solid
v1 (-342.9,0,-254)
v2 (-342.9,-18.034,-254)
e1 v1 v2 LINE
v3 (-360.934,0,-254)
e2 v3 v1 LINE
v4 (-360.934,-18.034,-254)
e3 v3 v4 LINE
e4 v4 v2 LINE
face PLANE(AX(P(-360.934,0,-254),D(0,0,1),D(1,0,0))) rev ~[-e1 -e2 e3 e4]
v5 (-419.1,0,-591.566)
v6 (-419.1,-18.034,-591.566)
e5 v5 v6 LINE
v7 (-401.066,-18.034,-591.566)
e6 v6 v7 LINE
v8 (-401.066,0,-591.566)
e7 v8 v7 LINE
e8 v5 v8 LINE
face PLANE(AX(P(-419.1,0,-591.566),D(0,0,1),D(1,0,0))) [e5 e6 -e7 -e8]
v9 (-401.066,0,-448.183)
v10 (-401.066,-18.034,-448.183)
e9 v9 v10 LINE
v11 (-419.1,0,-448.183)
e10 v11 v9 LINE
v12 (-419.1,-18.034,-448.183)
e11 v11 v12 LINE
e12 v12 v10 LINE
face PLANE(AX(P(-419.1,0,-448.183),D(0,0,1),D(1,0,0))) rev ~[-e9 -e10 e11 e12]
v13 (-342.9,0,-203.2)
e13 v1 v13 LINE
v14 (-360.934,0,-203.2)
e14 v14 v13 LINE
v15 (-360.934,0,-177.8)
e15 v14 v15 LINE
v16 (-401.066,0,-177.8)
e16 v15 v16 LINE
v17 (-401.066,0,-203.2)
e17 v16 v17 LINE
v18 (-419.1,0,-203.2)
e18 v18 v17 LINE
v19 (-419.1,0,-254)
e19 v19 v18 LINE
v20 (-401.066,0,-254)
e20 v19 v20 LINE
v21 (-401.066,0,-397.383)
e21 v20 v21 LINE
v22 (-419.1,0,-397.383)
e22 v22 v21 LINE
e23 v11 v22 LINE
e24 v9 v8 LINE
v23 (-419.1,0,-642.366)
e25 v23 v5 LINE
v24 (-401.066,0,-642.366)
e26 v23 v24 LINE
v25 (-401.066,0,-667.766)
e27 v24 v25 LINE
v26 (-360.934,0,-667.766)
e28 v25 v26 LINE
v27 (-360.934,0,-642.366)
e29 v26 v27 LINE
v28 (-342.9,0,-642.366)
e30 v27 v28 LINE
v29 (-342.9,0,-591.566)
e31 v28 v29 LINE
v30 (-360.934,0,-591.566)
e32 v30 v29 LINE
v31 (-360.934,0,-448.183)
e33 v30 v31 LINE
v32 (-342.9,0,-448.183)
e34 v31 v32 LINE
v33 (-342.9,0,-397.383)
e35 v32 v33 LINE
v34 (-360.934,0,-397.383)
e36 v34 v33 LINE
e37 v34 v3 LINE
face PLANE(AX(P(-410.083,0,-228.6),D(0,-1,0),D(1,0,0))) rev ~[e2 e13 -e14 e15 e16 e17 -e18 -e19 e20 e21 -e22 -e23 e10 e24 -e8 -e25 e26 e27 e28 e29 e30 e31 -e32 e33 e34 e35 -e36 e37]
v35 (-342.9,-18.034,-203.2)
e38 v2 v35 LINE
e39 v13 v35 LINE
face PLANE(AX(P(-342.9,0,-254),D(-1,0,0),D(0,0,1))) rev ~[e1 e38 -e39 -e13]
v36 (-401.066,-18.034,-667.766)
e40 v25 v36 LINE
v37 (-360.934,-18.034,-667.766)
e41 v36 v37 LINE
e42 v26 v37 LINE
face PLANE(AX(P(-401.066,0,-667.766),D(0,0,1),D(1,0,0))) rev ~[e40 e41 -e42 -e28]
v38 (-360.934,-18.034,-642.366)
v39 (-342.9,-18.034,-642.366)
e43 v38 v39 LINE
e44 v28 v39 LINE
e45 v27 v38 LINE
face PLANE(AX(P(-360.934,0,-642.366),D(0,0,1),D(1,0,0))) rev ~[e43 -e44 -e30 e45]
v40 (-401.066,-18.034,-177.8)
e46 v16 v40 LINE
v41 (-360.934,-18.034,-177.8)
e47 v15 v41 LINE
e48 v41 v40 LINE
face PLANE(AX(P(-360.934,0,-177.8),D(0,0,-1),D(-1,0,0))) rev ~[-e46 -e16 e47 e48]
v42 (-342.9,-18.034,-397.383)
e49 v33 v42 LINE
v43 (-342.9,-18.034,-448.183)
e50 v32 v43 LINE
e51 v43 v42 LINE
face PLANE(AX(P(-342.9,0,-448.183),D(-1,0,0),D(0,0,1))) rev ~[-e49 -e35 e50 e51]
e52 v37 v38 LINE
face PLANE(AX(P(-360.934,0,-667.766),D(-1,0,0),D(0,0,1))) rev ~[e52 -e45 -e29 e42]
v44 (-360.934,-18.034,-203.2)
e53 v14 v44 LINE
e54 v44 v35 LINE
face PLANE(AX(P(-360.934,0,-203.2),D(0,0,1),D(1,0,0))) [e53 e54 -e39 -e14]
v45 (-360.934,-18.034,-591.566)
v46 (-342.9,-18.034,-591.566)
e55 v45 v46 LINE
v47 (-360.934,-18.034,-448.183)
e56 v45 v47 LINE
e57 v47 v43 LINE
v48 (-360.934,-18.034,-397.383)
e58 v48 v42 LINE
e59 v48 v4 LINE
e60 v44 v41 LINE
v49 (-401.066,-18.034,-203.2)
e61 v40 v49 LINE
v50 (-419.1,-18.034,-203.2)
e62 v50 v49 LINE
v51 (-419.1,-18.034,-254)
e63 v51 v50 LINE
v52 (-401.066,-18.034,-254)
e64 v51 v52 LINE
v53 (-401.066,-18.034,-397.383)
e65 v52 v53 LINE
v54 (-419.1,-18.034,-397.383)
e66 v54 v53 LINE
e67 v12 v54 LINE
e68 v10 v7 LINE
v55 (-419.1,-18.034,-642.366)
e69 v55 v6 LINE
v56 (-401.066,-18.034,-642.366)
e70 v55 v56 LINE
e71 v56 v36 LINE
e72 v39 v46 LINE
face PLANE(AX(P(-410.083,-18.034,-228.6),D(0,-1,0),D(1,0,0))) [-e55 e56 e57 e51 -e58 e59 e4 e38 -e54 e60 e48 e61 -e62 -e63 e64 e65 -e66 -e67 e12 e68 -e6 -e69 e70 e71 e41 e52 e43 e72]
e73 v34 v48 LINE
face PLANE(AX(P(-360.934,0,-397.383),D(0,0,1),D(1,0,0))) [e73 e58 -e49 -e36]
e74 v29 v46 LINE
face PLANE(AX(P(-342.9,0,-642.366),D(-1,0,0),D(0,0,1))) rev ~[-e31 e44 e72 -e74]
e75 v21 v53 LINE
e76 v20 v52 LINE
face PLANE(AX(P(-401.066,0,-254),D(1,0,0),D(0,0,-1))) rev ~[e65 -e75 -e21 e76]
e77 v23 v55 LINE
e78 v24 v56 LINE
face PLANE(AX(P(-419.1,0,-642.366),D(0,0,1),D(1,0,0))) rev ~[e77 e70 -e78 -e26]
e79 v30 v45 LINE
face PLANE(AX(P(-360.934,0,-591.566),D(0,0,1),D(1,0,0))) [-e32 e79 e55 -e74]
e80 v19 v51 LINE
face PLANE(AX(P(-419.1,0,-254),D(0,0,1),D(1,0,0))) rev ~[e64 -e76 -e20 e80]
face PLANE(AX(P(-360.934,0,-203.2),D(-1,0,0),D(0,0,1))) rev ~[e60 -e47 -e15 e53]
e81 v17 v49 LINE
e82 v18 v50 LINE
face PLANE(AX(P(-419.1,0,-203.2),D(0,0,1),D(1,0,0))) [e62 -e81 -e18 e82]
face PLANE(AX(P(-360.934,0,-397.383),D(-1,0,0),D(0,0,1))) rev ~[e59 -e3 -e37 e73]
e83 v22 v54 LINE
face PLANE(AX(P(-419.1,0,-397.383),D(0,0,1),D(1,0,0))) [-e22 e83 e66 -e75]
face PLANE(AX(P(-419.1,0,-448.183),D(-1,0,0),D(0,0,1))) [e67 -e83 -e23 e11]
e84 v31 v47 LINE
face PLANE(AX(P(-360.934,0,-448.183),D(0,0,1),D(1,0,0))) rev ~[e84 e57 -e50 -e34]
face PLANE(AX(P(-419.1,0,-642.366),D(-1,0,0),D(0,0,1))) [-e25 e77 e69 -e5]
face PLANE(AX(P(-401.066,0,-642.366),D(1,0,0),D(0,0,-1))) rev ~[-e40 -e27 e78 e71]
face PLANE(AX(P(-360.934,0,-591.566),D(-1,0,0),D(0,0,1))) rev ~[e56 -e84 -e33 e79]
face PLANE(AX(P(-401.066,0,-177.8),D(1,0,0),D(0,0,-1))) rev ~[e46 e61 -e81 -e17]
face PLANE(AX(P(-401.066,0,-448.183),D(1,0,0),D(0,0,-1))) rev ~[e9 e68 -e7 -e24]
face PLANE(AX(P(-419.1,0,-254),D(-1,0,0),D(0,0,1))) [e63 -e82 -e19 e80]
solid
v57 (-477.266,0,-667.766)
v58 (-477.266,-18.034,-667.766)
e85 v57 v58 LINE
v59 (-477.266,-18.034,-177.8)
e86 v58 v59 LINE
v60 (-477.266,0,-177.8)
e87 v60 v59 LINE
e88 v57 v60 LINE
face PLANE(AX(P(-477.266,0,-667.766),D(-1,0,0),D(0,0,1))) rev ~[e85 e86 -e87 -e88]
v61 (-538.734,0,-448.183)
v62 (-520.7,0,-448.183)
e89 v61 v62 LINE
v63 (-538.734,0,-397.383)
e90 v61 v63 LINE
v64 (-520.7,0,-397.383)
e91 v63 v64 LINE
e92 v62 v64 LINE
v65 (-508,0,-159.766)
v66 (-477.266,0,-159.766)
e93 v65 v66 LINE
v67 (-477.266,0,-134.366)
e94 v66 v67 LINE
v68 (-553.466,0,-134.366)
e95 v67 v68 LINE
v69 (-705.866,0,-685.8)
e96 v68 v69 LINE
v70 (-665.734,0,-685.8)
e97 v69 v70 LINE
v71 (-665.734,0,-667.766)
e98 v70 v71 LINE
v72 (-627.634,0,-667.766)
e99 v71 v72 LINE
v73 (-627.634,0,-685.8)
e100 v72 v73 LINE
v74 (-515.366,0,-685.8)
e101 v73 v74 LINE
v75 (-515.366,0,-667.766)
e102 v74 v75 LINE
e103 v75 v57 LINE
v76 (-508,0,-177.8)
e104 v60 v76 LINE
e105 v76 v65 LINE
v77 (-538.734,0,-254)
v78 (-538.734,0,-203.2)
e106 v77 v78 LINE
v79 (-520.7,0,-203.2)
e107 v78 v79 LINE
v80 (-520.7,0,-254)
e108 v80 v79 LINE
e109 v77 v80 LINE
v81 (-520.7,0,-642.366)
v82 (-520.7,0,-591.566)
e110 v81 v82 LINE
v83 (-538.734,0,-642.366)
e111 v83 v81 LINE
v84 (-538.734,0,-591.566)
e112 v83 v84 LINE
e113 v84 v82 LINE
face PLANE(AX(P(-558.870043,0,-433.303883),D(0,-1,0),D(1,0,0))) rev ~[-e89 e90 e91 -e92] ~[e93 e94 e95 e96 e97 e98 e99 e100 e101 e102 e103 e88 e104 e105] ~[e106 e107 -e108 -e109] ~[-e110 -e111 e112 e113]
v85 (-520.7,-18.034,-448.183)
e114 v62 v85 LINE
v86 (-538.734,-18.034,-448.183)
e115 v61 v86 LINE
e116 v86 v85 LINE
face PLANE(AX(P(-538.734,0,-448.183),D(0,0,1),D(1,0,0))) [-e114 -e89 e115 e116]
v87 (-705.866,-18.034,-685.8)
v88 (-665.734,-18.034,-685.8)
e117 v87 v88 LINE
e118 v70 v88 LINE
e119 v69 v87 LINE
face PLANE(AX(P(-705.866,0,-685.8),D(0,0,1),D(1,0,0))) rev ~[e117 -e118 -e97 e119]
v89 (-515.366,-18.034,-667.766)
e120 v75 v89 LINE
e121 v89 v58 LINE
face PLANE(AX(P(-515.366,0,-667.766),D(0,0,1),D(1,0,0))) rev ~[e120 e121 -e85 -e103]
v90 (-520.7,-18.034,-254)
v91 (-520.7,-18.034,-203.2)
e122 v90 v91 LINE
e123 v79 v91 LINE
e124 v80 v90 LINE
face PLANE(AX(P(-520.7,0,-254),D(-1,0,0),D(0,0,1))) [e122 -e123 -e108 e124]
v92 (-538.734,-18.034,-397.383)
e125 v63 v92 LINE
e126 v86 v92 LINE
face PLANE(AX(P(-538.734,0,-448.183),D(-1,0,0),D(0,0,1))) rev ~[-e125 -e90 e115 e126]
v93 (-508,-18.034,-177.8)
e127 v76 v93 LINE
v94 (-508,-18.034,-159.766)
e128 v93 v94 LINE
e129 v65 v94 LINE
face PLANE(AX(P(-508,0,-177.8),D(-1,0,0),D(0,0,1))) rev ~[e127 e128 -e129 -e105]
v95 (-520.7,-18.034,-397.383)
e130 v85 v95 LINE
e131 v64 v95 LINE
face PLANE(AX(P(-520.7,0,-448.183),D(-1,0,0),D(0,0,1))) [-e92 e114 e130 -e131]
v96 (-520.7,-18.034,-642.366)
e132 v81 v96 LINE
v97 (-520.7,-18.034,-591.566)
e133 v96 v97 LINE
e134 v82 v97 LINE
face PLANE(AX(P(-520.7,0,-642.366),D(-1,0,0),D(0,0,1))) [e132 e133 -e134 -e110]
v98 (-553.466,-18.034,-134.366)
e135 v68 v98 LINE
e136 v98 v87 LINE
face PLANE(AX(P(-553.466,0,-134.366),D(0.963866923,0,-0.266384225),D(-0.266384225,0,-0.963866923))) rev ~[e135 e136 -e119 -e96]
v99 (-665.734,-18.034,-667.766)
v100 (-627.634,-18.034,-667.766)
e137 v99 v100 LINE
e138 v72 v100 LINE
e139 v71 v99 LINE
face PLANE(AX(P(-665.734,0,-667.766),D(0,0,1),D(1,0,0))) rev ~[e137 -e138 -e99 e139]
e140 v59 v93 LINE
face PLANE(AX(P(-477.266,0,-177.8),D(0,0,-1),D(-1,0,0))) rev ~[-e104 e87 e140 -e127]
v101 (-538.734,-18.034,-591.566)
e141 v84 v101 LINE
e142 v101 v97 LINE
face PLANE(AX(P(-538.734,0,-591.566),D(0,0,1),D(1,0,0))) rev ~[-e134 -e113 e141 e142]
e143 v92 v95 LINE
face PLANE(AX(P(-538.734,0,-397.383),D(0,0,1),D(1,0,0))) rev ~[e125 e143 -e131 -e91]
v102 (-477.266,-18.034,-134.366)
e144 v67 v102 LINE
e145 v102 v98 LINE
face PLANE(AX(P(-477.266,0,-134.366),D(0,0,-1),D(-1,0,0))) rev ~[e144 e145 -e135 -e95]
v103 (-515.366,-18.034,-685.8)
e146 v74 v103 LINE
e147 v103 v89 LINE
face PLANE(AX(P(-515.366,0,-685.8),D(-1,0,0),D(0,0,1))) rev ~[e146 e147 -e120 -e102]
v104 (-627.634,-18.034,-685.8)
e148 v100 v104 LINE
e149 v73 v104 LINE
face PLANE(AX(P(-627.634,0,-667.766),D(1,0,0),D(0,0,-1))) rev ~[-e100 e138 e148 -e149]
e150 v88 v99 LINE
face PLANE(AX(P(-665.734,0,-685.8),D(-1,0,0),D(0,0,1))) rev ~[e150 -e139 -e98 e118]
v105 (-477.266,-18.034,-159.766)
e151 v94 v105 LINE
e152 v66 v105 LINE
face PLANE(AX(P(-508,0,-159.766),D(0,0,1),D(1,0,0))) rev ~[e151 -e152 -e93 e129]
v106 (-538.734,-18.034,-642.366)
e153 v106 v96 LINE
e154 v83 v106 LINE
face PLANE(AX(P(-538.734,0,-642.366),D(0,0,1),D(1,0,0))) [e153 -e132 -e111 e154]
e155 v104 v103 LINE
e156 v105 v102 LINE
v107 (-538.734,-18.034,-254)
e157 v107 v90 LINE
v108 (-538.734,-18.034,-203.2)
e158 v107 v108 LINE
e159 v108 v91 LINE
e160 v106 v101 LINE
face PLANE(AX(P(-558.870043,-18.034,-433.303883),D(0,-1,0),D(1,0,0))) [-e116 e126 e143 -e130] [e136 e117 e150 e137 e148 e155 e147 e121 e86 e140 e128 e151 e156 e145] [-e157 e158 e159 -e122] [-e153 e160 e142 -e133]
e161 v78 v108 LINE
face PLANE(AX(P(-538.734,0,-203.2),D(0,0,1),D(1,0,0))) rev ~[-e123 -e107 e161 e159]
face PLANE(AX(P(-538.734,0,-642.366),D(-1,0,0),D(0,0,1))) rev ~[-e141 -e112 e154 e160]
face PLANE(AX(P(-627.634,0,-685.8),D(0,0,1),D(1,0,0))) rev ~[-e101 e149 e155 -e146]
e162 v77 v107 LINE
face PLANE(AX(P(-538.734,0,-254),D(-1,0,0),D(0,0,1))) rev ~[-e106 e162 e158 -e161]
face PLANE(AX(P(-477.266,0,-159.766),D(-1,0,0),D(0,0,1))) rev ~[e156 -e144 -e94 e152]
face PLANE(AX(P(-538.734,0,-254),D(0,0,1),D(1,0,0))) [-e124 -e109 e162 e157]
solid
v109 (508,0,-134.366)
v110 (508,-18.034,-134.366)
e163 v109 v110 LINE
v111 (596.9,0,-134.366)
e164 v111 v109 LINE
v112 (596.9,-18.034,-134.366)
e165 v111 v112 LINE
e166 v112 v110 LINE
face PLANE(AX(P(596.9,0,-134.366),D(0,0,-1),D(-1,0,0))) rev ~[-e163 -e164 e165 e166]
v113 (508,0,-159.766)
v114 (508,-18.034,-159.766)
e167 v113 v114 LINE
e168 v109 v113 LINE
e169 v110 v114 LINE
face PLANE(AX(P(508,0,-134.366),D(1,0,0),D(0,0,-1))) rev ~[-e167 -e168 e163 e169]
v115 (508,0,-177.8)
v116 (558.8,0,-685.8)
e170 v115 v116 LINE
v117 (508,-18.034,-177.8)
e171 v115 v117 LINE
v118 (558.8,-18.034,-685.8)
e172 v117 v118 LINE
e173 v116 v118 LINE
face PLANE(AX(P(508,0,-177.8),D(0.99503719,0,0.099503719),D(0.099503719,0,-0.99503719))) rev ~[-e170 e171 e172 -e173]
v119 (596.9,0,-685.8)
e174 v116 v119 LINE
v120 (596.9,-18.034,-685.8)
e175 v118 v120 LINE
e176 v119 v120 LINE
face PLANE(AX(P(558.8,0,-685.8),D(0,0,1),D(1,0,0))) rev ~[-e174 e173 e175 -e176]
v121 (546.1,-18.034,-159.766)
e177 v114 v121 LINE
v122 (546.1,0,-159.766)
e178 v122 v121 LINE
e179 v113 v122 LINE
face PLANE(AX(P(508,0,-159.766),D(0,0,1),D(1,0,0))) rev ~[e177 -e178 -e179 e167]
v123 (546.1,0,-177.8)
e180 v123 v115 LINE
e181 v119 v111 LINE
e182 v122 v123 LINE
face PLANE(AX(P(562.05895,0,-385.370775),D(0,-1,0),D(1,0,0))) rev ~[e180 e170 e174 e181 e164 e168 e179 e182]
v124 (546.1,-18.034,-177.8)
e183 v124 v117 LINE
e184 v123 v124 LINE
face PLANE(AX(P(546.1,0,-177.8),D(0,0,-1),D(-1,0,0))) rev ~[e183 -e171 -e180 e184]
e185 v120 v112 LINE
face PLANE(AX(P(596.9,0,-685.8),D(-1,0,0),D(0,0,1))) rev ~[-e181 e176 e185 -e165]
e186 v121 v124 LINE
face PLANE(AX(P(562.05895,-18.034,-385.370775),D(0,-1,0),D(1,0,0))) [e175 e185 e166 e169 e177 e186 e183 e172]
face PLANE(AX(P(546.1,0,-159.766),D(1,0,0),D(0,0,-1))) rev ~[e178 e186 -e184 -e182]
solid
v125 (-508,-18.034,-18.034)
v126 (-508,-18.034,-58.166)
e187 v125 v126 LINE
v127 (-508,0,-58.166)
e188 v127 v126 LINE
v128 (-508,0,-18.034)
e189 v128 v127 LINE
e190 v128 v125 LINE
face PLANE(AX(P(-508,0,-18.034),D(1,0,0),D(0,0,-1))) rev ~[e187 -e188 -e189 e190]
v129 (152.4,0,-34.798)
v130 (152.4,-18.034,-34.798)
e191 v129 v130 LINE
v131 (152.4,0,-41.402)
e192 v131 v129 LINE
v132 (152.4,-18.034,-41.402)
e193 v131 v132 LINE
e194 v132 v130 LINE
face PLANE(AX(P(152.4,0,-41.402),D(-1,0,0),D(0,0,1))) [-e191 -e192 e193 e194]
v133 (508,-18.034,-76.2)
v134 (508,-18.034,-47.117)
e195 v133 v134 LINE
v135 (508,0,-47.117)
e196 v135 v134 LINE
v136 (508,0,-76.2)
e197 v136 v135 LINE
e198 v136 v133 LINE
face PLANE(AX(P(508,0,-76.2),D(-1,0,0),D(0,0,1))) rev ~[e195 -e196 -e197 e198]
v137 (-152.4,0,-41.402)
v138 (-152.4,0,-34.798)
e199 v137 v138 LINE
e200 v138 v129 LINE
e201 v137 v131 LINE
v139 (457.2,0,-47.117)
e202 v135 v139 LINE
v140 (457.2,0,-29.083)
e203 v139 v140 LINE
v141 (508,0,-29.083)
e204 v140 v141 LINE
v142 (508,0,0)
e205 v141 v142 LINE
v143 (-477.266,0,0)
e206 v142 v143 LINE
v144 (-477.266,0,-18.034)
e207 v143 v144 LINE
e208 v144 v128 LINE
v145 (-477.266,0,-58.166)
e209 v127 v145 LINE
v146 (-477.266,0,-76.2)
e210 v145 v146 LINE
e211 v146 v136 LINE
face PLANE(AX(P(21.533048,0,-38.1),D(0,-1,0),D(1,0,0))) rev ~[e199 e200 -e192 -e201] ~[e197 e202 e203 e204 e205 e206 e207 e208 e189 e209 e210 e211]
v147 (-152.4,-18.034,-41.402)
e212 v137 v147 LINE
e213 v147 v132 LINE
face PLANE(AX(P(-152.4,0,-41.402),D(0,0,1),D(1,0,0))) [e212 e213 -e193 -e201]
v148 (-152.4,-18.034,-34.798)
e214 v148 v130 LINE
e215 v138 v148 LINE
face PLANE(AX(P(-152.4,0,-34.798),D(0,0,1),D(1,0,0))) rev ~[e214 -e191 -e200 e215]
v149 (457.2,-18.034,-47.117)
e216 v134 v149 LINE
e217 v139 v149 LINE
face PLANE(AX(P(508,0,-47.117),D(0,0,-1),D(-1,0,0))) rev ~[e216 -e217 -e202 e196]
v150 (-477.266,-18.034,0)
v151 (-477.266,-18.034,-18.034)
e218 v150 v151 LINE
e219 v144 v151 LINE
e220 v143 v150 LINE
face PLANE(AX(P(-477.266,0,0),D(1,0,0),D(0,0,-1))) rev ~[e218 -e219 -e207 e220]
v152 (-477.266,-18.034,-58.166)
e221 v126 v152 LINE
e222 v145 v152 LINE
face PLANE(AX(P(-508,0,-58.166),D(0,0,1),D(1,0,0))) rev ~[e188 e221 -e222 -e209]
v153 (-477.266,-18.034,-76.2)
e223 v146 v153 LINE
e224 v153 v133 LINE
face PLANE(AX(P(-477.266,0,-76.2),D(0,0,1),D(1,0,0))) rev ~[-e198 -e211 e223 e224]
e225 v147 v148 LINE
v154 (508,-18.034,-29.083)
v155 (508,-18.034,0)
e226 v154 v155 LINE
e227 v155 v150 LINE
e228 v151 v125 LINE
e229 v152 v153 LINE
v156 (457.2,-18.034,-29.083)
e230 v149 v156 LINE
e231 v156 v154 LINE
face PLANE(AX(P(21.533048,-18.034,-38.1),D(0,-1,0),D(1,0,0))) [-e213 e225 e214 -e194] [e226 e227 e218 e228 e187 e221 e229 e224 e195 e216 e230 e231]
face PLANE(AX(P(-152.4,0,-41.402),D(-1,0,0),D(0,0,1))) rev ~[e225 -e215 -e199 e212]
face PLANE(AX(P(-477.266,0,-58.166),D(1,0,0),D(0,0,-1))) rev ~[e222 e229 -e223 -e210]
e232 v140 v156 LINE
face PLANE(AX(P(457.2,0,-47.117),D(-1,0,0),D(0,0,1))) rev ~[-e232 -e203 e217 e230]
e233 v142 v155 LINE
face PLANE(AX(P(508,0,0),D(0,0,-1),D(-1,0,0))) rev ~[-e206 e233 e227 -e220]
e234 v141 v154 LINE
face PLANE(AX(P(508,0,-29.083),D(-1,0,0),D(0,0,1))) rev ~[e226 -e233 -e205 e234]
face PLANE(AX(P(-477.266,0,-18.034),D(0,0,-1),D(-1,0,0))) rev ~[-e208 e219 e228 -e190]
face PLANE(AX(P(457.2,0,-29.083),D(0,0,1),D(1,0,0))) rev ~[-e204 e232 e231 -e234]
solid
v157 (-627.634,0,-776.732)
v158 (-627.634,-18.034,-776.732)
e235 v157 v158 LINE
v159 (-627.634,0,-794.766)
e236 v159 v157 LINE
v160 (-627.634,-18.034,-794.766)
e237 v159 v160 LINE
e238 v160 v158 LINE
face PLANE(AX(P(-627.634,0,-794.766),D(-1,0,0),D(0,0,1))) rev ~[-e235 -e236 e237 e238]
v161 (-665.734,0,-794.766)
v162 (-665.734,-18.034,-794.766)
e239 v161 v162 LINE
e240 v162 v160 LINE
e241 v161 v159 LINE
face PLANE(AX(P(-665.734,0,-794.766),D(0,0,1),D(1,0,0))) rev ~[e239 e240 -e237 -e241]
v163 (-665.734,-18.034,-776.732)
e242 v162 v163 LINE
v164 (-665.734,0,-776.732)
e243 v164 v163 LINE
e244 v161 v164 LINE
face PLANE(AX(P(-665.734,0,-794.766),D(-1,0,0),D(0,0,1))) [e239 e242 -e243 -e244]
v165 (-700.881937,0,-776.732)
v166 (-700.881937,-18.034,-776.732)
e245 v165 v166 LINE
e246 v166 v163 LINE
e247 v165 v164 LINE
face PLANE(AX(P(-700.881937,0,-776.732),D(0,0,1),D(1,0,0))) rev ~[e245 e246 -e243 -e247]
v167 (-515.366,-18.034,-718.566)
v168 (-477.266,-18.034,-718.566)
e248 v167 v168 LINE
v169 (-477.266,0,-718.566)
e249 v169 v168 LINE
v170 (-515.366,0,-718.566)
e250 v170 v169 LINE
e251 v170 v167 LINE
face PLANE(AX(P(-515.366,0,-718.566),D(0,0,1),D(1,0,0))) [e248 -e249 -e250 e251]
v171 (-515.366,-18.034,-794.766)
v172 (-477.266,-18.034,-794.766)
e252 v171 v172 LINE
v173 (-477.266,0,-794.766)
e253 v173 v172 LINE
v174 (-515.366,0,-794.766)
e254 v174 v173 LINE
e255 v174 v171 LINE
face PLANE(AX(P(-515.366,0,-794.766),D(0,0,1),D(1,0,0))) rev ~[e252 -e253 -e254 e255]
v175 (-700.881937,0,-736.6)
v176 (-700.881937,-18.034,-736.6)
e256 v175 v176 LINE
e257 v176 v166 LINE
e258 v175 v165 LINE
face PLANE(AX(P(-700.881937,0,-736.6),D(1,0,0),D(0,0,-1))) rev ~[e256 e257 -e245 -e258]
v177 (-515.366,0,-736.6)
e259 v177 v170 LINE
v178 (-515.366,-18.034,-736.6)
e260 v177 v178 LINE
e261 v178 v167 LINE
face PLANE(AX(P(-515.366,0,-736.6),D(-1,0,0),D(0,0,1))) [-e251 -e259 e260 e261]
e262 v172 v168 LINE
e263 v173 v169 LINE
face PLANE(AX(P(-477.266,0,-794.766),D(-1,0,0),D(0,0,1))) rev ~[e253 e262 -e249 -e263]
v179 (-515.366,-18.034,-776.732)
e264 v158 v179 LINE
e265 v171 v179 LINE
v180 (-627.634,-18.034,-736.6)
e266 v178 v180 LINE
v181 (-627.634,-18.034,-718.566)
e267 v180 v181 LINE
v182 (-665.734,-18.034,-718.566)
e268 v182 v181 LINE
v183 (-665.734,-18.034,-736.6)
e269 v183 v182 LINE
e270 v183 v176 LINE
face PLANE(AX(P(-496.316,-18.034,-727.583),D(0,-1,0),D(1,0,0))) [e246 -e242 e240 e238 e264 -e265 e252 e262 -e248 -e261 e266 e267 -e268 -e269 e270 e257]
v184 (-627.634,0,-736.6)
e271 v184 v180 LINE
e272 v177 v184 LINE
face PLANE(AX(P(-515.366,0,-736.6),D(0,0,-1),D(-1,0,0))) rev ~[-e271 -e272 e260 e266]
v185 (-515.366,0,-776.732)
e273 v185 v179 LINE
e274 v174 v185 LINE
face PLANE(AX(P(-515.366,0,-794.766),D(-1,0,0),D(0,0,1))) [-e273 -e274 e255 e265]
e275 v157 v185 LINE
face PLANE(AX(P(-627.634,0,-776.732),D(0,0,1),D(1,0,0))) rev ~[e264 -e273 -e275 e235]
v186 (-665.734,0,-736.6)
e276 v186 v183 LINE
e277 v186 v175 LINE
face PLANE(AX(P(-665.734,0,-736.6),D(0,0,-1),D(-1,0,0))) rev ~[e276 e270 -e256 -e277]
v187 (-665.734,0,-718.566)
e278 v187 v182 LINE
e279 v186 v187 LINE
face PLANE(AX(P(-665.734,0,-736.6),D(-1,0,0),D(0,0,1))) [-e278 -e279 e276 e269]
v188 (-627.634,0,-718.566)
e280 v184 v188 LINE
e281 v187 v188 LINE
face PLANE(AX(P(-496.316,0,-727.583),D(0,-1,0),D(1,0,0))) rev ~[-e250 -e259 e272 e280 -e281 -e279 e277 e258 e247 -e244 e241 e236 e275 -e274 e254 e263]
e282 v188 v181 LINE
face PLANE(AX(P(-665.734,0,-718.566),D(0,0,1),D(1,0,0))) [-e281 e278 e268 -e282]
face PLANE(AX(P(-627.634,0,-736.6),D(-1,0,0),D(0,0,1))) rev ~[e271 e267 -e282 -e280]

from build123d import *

# Parameters (mm, degrees)
F1_W     = 304.8
F1_H     = 6.604
F2_DEPTH = 18.034
F1_W_2   = 18.034
F1_H_2   = 50.8
F1_W_3   = 38.1
F1_H_3   = 18.034


# Not quite as in the source:
# - a variable given as a bare number and used for a length is read in inches; the dataset says mm whatever the document's units were


with BuildPart() as f2:
    # F1 (on Front) → F2 (new body)
    with BuildSketch(Plane.XZ):
        Polygon((508, 0), (-477.266, 0), (-477.266, -18.034), (-508, -18.034), (-508, -58.166), (-477.266, -58.166), (-477.266, -76.2), (508, -76.2), (508, -47.117), (457.2, -47.117), (457.2, -29.083), (508, -29.083), align=None)
        with Locations((0, -38.1)):
            Rectangle(F1_W, F1_H, mode=Mode.SUBTRACT)
    extrude(amount=F2_DEPTH)


with BuildPart() as f2b:
    # F1 (on Front) → F2, piece 2 (new body)
    with BuildSketch(Plane.XZ):
        Polygon((596.9, -685.8), (596.9, -134.366), (508, -134.366), (508, -159.766), (546.1, -159.766), (546.1, -177.8), (508, -177.8), (558.8, -685.8), align=None)
    extrude(amount=F2_DEPTH)


with BuildPart() as f2c:
    # F1 (on Front) → F2, piece 3 (new body)
    with BuildSketch(Plane.XZ):
        Polygon((-477.266, -667.766), (-477.266, -177.8), (-508, -177.8), (-508, -159.766), (-477.266, -159.766), (-477.266, -134.366), (-553.466, -134.366), (-705.866, -685.8), (-665.734, -685.8), (-665.734, -667.766), (-627.634, -667.766), (-627.634, -685.8), (-515.366, -685.8), (-515.366, -667.766), align=None)
        with Locations((-529.717, -616.966)):
            Rectangle(F1_W_2, F1_H_2, mode=Mode.SUBTRACT)
        with Locations((-529.717, -422.783)):
            Rectangle(F1_W_2, F1_H_2, mode=Mode.SUBTRACT)
        with Locations((-529.717, -228.6)):
            Rectangle(F1_W_2, F1_H_2, mode=Mode.SUBTRACT)
    extrude(amount=F2_DEPTH)


with BuildPart() as f2d:
    # F1 (on Front) → F2, piece 4 (new body)
    with BuildSketch(Plane.XZ):
        with Locations((-410.083, -228.6)):
            Rectangle(F1_W_2, F1_H_2)
        with Locations((-351.917, -228.6)):
            Rectangle(F1_W_2, F1_H_2)
        with Locations((-351.917, -422.783)):
            Rectangle(F1_W_2, F1_H_2)
        with Locations((-410.083, -422.783)):
            Rectangle(F1_W_2, F1_H_2)
        with Locations((-410.083, -616.966)):
            Rectangle(F1_W_2, F1_H_2)
        with Locations((-351.917, -616.966)):
            Rectangle(F1_W_2, F1_H_2)
        Polygon((-360.934, -177.8), (-401.066, -177.8), (-401.066, -203.2), (-401.066, -254), (-401.066, -397.383), (-401.066, -448.183), (-401.066, -591.566), (-401.066, -642.366), (-401.066, -667.766), (-360.934, -667.766), (-360.934, -642.366), (-360.934, -591.566), (-360.934, -448.183), (-360.934, -397.383), (-360.934, -254), (-360.934, -203.2), align=None)
    extrude(amount=F2_DEPTH)


with BuildPart() as f2e:
    # F1 (on Front) → F2, piece 5 (new body)
    with BuildSketch(Plane.XZ):
        with Locations((-496.316, -727.583)):
            Rectangle(F1_W_3, F1_H_3)
        Polygon((-665.734, -736.6), (-700.8819373561, -736.6), (-700.8819373561, -776.732), (-665.734, -776.732), (-627.634, -776.732), (-515.366, -776.732), (-477.266, -776.732), (-477.266, -736.6), (-515.366, -736.6), (-627.634, -736.6), align=None)
        with Locations((-496.316, -785.749)):
            Rectangle(F1_W_3, F1_H_3)
        with Locations((-646.684, -727.583)):
            Rectangle(F1_W_3, F1_H_3)
        with Locations((-646.684, -785.749)):
            Rectangle(F1_W_3, F1_H_3)
    extrude(amount=F2_DEPTH)


solid = Compound([f2.part, f2b.part, f2c.part, f2d.part, f2e.part])
